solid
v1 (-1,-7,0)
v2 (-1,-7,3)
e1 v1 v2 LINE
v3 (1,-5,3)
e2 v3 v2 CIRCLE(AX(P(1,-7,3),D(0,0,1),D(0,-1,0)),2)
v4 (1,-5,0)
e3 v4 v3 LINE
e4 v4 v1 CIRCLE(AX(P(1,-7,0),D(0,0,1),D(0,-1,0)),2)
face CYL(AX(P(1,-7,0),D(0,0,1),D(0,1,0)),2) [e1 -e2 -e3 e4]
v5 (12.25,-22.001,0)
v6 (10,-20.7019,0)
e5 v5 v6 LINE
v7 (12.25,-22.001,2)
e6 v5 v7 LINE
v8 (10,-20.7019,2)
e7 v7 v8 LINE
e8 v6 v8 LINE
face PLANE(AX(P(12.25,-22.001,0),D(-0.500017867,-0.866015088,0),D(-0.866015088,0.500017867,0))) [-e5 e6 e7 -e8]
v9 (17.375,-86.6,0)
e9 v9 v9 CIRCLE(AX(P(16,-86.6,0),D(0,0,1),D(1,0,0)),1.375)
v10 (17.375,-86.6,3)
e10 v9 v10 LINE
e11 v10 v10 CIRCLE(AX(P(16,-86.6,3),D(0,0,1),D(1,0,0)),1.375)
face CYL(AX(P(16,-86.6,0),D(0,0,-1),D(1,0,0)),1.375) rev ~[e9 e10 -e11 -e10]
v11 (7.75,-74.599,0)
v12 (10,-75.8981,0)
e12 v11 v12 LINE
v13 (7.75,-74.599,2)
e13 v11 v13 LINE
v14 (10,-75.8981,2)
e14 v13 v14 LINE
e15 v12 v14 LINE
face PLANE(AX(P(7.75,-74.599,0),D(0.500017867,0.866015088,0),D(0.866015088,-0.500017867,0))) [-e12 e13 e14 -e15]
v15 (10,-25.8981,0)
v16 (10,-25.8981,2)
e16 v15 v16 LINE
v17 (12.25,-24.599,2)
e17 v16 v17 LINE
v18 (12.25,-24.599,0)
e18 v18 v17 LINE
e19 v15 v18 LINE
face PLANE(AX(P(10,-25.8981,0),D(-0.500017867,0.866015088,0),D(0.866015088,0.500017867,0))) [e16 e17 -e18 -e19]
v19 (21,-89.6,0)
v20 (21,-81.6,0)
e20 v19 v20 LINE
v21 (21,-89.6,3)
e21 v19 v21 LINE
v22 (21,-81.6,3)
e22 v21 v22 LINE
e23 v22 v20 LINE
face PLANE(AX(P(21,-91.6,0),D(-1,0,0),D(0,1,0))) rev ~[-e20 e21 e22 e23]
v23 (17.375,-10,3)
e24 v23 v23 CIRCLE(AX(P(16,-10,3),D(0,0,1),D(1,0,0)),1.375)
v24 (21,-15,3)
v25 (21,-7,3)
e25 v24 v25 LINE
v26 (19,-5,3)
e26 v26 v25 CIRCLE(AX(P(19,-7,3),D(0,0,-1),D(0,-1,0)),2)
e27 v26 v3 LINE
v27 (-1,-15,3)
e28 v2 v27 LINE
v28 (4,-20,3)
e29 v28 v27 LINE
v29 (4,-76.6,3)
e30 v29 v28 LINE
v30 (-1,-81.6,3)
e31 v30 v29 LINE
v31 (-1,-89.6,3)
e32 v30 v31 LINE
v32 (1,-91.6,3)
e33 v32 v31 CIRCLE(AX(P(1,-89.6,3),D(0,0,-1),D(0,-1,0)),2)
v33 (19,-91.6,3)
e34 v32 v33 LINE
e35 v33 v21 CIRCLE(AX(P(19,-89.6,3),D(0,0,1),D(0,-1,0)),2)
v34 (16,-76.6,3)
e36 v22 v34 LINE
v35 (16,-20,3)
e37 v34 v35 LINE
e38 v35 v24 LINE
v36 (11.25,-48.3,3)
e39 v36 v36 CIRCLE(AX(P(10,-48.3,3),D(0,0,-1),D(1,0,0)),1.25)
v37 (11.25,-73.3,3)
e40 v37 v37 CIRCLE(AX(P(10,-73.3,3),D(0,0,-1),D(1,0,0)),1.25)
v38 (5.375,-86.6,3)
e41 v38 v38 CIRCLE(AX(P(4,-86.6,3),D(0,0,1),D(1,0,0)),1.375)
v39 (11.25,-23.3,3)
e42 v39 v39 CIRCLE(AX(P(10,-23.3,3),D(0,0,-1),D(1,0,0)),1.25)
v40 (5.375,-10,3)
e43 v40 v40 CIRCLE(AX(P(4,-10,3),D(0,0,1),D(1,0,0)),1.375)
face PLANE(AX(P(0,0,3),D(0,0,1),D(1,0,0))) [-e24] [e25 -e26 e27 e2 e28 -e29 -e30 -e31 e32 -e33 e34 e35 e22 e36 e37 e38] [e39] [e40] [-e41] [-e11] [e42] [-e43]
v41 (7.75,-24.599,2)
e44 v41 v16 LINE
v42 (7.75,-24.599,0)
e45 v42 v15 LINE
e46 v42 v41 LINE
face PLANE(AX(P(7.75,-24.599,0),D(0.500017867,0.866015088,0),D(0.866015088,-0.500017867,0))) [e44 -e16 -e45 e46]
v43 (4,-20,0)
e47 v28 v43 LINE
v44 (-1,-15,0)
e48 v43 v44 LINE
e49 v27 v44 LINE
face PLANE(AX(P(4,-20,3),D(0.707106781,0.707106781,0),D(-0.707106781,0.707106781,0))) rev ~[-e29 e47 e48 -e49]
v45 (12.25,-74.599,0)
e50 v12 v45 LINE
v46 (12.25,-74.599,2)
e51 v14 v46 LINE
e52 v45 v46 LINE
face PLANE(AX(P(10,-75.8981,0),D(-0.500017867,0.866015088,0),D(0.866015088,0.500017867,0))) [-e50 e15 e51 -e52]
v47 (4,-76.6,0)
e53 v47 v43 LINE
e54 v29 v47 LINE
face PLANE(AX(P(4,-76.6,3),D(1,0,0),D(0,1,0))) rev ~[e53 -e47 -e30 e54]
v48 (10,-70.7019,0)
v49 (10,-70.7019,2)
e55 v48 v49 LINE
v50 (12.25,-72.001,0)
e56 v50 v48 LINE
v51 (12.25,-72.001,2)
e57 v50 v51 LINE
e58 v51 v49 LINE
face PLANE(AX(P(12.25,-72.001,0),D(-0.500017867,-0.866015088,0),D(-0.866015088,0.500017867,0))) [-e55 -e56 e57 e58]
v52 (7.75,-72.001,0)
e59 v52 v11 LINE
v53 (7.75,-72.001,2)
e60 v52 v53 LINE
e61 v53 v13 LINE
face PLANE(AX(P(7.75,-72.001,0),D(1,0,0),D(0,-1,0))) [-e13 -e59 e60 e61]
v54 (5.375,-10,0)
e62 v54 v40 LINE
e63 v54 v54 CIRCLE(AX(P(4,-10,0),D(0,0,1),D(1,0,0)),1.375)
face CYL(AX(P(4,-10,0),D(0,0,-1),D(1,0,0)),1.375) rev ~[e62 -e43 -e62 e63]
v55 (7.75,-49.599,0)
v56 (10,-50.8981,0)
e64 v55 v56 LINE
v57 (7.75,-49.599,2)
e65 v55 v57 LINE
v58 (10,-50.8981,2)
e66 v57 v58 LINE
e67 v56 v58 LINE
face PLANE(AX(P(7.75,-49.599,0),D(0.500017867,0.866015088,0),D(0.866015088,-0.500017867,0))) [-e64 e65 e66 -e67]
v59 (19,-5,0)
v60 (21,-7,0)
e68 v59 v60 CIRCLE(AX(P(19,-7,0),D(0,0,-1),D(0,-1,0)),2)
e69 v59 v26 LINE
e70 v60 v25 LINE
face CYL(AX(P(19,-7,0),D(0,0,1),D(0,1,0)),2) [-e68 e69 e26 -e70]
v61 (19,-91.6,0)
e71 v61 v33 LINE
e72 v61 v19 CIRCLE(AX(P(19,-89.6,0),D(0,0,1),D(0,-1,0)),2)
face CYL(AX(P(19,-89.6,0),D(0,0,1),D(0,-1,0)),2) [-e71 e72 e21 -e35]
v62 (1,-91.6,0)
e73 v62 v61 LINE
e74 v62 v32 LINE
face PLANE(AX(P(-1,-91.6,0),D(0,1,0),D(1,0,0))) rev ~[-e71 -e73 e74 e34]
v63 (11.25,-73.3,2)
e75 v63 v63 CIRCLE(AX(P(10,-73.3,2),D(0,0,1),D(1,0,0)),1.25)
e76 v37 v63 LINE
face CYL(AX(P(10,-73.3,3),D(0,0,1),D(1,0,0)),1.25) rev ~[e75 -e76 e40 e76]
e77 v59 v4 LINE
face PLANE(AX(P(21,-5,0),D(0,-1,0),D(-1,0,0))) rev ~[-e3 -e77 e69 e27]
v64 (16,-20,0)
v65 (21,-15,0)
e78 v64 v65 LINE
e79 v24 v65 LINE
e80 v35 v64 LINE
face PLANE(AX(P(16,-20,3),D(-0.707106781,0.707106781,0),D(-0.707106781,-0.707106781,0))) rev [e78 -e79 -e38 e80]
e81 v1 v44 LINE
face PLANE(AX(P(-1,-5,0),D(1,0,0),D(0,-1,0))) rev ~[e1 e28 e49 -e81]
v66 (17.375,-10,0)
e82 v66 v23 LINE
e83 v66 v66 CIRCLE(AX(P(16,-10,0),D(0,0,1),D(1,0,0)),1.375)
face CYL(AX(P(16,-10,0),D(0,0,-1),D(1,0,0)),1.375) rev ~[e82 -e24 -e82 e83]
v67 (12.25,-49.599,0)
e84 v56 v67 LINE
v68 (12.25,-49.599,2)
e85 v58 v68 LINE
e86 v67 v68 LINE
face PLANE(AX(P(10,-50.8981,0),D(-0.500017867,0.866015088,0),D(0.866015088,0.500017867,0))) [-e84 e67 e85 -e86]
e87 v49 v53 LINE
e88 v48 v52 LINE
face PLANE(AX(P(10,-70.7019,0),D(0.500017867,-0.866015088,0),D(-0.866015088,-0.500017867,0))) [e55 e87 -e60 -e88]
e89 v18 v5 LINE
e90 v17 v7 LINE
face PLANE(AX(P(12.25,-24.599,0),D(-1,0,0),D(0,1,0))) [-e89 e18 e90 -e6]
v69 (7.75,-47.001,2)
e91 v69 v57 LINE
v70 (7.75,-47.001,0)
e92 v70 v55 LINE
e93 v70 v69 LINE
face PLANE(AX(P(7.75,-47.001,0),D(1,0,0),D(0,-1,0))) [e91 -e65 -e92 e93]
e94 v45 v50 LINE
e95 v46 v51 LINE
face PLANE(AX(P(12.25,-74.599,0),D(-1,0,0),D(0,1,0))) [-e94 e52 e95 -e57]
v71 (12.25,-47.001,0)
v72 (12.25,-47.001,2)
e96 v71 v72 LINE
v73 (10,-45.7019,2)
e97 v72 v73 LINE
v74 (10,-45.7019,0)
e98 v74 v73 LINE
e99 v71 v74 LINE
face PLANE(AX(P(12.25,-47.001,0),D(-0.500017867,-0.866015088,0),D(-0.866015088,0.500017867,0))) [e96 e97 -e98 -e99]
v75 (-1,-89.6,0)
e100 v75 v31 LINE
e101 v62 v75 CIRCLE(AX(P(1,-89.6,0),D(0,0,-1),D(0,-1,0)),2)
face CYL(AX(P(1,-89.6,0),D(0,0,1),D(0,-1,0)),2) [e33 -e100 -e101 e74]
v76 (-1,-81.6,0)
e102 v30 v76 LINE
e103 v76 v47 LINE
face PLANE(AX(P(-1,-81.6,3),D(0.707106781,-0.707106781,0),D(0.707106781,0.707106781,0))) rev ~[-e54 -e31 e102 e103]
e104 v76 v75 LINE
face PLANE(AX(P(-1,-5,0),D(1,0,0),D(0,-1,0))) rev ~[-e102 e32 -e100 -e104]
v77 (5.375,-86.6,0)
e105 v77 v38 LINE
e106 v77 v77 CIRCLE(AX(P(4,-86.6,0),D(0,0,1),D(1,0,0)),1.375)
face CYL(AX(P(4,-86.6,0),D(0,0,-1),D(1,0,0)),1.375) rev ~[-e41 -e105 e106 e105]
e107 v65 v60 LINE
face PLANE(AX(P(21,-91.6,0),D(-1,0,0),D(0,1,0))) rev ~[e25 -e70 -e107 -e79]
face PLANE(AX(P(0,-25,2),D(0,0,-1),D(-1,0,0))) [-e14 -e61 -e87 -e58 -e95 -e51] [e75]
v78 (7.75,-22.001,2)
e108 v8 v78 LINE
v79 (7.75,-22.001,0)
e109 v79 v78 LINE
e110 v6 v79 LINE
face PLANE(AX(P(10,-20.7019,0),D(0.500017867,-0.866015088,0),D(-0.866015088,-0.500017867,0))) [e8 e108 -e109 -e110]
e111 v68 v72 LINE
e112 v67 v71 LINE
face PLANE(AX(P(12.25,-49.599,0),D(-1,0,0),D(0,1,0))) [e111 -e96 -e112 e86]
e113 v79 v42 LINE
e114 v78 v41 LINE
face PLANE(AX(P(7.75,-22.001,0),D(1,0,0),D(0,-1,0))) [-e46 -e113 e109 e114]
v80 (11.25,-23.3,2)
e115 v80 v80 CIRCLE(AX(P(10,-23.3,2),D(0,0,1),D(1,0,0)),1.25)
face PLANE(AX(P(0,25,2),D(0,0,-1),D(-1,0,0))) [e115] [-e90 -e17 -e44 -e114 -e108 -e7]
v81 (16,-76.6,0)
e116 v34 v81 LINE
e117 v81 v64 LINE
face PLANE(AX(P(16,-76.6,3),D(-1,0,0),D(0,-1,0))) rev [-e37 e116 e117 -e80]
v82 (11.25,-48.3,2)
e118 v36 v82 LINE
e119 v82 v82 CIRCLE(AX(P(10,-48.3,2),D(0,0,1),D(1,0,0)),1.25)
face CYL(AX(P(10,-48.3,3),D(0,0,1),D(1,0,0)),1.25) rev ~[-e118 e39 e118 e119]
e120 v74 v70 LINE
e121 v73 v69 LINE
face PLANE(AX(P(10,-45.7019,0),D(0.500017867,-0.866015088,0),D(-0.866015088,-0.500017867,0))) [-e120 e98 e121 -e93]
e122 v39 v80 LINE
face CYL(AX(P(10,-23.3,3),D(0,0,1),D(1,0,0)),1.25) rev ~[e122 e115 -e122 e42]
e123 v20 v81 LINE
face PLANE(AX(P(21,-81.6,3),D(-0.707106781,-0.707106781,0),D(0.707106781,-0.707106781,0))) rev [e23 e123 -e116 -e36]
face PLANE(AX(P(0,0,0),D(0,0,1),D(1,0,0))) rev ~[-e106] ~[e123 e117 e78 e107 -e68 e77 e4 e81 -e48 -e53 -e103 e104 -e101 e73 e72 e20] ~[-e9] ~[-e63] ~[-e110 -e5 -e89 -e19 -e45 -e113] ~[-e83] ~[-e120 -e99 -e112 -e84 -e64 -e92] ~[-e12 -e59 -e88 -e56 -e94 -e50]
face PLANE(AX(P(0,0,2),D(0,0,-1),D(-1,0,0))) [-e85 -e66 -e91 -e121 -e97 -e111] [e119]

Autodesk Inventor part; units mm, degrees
ref_plane "YZ Plane" through (0, 0, 0) normal (1, 0, 0) x (0, 1, 0)
ref_plane "XZ Plane" through (0, 0, 0) normal (0, 1, 0) x (-1, 0, 0)
ref_plane "XY Plane" through (0, 0, 0) normal (0, 0, 1) x (1, 0, 0)
sketch "Sketch1" plane through (0, 0, 0) normal (0, 0, 1) x (1, 0, 0)
  line L0 (12.5, 0) -> (18.7, 0) construction
  line L1 (12.5, 0) -> (12.5, -92) construction
  line L2 (12.5, -92) -> (18.7, -92) construction
  line L3 (18.7, -90.35) -> (18.7, -92) construction
  line L4 (18.7, -90.35) -> (19, -90.0495) construction
  line L5 (19, -90.0495) -> (19, -83.1505) construction
  line L6 (19, -83.1505) -> (18.7, -82.85) construction
  line L7 (18.7, -13.75) -> (18.7, -82.85) construction
  line L8 (18.7, -13.75) -> (19, -13.4495) construction
  line L9 (19, -13.4495) -> (19, -6.5505) construction
  line L10 (19, -6.5505) -> (18.7, -6.25) construction
  line L11 (18.7, 0) -> (18.7, -6.25) construction
  circle A0 centre (16, -86.6) radius 1.25 construction
  circle A1 centre (16, -10) radius 1.25 construction
  line L12 (0.5, 0) -> (6.7, 0) construction
  line L13 (0.5, 0) -> (0.5, -92) construction
  line L14 (0.5, -92) -> (6.7, -92) construction
  line L15 (6.7, -90.35) -> (6.7, -92) construction
  line L16 (6.7, -90.35) -> (7, -90.0495) construction
  line L17 (7, -90.0495) -> (7, -83.1505) construction
  line L18 (7, -83.1505) -> (6.7, -82.85) construction
  line L19 (6.7, -13.75) -> (6.7, -82.85) construction
  line L20 (6.7, -13.75) -> (7, -13.4495) construction
  line L21 (7, -13.4495) -> (7, -6.5505) construction
  line L22 (7, -6.5505) -> (6.7, -6.25) construction
  line L23 (6.7, 0) -> (6.7, -6.25) construction
  circle A2 centre (4, -86.6) radius 1.25 construction
  circle A3 centre (4, -10) radius 1.25 construction
  circle A4 centre (4, -86.6) radius 1.375
  circle A5 centre (16, -86.6) radius 1.375
  circle A6 centre (16, -10) radius 1.375
  circle A7 centre (4, -10) radius 1.375
  line L24 (4, -86.6) -> (4, -10) construction
  line L25 (4, -10) -> (16, -10) construction
  line L26 (16, -10) -> (16, -86.6) construction
  line L27 (16, -86.6) -> (4, -86.6) construction
  line L28 (-1, -5) -> (-1, -91.6)
  line L29 (-1, -91.6) -> (21, -91.6)
  line L30 (21, -91.6) -> (21, -5)
  line L31 (21, -5) -> (-1, -5)
  point P0 (0, 0)
  dimension "d0" = 2.75
  dimension "d1" = 2.75
  dimension "d2" = 2.75
  dimension "d3" = 2.75
  dimension "d4" = 5
extrude "Extrusion1" add sketch "Sketch1" along normal blind 3
sketch "Sketch2" plane through (0, 0, 3) normal (0, 0, 1) x (1, 0, 0)
  line L0 (-1, -91.6) -> (21, -91.6) projected
  line L1 (21, -91.6) -> (21, -5) projected
  line L2 (21, -5) -> (-1, -5) projected
  line L3 (-1, -5) -> (-1, -91.6) projected
  circle A0 centre (4, -86.6) radius 1.375 projected
  circle A1 centre (16, -86.6) radius 1.375 projected
  circle A2 centre (16, -10) radius 1.375 projected
  circle A3 centre (4, -10) radius 1.375 projected
  line L4 (-1, -81.6) -> (4, -76.6)
  line L5 (4, -76.6) -> (4, -20)
  line L6 (4, -20) -> (-1, -15)
  point P0 (0, 0)
  dimension "d7" = 5
  dimension "d8" = 45
  dimension "d9" = 45
  dimension "d10" = 10
  dimension "d11" = 10
extrude "Extrusion2" cut sketch "Sketch2" against normal through all contours L3 L6 L5 L4
ref_plane "Work Plane1" through (10, -91.6, 0) normal (-1, 0, 0) x (0, 0, 1)
mirror "Mirror1" about plane through (10, -91.6, 0) normal (-1, 0, 0) of "Extrusion2"
sketch "Sketch3" plane through (0, 0, 3) normal (0, 0, 1) x (1, 0, 0)
  line L0 (16, -20) -> (21, -15) projected
  line L1 (21, -15) -> (21, -5) projected
  line L2 (21, -5) -> (-1, -5) projected
  line L3 (-1, -5) -> (-1, -15) projected
  line L4 (-1, -15) -> (4, -20) projected
  line L5 (4, -20) -> (4, -76.6) projected
  line L6 (4, -76.6) -> (-1, -81.6) projected
  line L7 (-1, -81.6) -> (-1, -91.6) projected
  line L8 (-1, -91.6) -> (21, -91.6) projected
  line L9 (21, -91.6) -> (21, -81.6) projected
  line L10 (21, -81.6) -> (16, -76.6) projected
  line L11 (16, -76.6) -> (16, -20) projected
  circle A0 centre (4, -86.6) radius 1.375 projected
  circle A1 centre (16, -86.6) radius 1.375 projected
  circle A2 centre (16, -10) radius 1.375 projected
  circle A3 centre (4, -10) radius 1.375 projected
  circle A4 centre (10, -48.3) radius 1.25
  line L12 (10, -91.6) -> (10, -48.3)
  line L13 (10, -48.3) -> (4, -48.3)
  point P0 (0, 0)
  dimension "d14" = 2.5
  dimension "d15" = 43.3
  dimension "d16" = 86.6
extrude "Extrusion3" cut sketch "Sketch3" against normal through all contours L12 L13 A4 | A4 L13 L12
sketch "Sketch4" plane through (0, 0, 0) normal (0, 0, -1) x (-1, 0, 0)
  circle A0 centre (-10, -48.3) radius 1.25 projected
  line L0 (-10, -50.8981) -> (-12.25, -49.599)
  line L1 (-12.25, -49.599) -> (-12.25, -47.001)
  line L2 (-12.25, -47.001) -> (-10, -45.7019)
  line L3 (-10, -45.7019) -> (-7.75, -47.001)
  line L4 (-7.75, -47.001) -> (-7.75, -49.599)
  line L5 (-7.75, -49.599) -> (-10, -50.8981)
  line L6 (-4, -76.6) -> (-4, -20) projected
  point P0 (0, 0)
  dimension "d19" = 4.5
extrude "Extrusion4" cut sketch "Sketch4" against normal blind 2 contours A0 | L0 L1 L2 L3 L4 L5
pattern_linear "Rectangular Pattern1" count 3 spacing 25 along (0, -1, 0) of "Extrusion3", "Extrusion4" first direction both ways yes
ref_plane "Work Plane2" through (-1, -48.3, 0) normal (0, 1, 0) x (1, 0, 0)
fillet "Fillet1" radius 2 4 edges at (-1, -91.6, 1.5) (21, -91.6, 1.5) (-1, -5, 1.5) (21, -5, 1.5)
equation "\"d1\" = d0"
equation "\"d2\" = d0"
equation "\"d3\" = d0"
equation "\"d9\" = d8"
equation "\"d11\" = d10"
equation "\"d15\" = 0.5 * d16"
properties part number "A-06"
